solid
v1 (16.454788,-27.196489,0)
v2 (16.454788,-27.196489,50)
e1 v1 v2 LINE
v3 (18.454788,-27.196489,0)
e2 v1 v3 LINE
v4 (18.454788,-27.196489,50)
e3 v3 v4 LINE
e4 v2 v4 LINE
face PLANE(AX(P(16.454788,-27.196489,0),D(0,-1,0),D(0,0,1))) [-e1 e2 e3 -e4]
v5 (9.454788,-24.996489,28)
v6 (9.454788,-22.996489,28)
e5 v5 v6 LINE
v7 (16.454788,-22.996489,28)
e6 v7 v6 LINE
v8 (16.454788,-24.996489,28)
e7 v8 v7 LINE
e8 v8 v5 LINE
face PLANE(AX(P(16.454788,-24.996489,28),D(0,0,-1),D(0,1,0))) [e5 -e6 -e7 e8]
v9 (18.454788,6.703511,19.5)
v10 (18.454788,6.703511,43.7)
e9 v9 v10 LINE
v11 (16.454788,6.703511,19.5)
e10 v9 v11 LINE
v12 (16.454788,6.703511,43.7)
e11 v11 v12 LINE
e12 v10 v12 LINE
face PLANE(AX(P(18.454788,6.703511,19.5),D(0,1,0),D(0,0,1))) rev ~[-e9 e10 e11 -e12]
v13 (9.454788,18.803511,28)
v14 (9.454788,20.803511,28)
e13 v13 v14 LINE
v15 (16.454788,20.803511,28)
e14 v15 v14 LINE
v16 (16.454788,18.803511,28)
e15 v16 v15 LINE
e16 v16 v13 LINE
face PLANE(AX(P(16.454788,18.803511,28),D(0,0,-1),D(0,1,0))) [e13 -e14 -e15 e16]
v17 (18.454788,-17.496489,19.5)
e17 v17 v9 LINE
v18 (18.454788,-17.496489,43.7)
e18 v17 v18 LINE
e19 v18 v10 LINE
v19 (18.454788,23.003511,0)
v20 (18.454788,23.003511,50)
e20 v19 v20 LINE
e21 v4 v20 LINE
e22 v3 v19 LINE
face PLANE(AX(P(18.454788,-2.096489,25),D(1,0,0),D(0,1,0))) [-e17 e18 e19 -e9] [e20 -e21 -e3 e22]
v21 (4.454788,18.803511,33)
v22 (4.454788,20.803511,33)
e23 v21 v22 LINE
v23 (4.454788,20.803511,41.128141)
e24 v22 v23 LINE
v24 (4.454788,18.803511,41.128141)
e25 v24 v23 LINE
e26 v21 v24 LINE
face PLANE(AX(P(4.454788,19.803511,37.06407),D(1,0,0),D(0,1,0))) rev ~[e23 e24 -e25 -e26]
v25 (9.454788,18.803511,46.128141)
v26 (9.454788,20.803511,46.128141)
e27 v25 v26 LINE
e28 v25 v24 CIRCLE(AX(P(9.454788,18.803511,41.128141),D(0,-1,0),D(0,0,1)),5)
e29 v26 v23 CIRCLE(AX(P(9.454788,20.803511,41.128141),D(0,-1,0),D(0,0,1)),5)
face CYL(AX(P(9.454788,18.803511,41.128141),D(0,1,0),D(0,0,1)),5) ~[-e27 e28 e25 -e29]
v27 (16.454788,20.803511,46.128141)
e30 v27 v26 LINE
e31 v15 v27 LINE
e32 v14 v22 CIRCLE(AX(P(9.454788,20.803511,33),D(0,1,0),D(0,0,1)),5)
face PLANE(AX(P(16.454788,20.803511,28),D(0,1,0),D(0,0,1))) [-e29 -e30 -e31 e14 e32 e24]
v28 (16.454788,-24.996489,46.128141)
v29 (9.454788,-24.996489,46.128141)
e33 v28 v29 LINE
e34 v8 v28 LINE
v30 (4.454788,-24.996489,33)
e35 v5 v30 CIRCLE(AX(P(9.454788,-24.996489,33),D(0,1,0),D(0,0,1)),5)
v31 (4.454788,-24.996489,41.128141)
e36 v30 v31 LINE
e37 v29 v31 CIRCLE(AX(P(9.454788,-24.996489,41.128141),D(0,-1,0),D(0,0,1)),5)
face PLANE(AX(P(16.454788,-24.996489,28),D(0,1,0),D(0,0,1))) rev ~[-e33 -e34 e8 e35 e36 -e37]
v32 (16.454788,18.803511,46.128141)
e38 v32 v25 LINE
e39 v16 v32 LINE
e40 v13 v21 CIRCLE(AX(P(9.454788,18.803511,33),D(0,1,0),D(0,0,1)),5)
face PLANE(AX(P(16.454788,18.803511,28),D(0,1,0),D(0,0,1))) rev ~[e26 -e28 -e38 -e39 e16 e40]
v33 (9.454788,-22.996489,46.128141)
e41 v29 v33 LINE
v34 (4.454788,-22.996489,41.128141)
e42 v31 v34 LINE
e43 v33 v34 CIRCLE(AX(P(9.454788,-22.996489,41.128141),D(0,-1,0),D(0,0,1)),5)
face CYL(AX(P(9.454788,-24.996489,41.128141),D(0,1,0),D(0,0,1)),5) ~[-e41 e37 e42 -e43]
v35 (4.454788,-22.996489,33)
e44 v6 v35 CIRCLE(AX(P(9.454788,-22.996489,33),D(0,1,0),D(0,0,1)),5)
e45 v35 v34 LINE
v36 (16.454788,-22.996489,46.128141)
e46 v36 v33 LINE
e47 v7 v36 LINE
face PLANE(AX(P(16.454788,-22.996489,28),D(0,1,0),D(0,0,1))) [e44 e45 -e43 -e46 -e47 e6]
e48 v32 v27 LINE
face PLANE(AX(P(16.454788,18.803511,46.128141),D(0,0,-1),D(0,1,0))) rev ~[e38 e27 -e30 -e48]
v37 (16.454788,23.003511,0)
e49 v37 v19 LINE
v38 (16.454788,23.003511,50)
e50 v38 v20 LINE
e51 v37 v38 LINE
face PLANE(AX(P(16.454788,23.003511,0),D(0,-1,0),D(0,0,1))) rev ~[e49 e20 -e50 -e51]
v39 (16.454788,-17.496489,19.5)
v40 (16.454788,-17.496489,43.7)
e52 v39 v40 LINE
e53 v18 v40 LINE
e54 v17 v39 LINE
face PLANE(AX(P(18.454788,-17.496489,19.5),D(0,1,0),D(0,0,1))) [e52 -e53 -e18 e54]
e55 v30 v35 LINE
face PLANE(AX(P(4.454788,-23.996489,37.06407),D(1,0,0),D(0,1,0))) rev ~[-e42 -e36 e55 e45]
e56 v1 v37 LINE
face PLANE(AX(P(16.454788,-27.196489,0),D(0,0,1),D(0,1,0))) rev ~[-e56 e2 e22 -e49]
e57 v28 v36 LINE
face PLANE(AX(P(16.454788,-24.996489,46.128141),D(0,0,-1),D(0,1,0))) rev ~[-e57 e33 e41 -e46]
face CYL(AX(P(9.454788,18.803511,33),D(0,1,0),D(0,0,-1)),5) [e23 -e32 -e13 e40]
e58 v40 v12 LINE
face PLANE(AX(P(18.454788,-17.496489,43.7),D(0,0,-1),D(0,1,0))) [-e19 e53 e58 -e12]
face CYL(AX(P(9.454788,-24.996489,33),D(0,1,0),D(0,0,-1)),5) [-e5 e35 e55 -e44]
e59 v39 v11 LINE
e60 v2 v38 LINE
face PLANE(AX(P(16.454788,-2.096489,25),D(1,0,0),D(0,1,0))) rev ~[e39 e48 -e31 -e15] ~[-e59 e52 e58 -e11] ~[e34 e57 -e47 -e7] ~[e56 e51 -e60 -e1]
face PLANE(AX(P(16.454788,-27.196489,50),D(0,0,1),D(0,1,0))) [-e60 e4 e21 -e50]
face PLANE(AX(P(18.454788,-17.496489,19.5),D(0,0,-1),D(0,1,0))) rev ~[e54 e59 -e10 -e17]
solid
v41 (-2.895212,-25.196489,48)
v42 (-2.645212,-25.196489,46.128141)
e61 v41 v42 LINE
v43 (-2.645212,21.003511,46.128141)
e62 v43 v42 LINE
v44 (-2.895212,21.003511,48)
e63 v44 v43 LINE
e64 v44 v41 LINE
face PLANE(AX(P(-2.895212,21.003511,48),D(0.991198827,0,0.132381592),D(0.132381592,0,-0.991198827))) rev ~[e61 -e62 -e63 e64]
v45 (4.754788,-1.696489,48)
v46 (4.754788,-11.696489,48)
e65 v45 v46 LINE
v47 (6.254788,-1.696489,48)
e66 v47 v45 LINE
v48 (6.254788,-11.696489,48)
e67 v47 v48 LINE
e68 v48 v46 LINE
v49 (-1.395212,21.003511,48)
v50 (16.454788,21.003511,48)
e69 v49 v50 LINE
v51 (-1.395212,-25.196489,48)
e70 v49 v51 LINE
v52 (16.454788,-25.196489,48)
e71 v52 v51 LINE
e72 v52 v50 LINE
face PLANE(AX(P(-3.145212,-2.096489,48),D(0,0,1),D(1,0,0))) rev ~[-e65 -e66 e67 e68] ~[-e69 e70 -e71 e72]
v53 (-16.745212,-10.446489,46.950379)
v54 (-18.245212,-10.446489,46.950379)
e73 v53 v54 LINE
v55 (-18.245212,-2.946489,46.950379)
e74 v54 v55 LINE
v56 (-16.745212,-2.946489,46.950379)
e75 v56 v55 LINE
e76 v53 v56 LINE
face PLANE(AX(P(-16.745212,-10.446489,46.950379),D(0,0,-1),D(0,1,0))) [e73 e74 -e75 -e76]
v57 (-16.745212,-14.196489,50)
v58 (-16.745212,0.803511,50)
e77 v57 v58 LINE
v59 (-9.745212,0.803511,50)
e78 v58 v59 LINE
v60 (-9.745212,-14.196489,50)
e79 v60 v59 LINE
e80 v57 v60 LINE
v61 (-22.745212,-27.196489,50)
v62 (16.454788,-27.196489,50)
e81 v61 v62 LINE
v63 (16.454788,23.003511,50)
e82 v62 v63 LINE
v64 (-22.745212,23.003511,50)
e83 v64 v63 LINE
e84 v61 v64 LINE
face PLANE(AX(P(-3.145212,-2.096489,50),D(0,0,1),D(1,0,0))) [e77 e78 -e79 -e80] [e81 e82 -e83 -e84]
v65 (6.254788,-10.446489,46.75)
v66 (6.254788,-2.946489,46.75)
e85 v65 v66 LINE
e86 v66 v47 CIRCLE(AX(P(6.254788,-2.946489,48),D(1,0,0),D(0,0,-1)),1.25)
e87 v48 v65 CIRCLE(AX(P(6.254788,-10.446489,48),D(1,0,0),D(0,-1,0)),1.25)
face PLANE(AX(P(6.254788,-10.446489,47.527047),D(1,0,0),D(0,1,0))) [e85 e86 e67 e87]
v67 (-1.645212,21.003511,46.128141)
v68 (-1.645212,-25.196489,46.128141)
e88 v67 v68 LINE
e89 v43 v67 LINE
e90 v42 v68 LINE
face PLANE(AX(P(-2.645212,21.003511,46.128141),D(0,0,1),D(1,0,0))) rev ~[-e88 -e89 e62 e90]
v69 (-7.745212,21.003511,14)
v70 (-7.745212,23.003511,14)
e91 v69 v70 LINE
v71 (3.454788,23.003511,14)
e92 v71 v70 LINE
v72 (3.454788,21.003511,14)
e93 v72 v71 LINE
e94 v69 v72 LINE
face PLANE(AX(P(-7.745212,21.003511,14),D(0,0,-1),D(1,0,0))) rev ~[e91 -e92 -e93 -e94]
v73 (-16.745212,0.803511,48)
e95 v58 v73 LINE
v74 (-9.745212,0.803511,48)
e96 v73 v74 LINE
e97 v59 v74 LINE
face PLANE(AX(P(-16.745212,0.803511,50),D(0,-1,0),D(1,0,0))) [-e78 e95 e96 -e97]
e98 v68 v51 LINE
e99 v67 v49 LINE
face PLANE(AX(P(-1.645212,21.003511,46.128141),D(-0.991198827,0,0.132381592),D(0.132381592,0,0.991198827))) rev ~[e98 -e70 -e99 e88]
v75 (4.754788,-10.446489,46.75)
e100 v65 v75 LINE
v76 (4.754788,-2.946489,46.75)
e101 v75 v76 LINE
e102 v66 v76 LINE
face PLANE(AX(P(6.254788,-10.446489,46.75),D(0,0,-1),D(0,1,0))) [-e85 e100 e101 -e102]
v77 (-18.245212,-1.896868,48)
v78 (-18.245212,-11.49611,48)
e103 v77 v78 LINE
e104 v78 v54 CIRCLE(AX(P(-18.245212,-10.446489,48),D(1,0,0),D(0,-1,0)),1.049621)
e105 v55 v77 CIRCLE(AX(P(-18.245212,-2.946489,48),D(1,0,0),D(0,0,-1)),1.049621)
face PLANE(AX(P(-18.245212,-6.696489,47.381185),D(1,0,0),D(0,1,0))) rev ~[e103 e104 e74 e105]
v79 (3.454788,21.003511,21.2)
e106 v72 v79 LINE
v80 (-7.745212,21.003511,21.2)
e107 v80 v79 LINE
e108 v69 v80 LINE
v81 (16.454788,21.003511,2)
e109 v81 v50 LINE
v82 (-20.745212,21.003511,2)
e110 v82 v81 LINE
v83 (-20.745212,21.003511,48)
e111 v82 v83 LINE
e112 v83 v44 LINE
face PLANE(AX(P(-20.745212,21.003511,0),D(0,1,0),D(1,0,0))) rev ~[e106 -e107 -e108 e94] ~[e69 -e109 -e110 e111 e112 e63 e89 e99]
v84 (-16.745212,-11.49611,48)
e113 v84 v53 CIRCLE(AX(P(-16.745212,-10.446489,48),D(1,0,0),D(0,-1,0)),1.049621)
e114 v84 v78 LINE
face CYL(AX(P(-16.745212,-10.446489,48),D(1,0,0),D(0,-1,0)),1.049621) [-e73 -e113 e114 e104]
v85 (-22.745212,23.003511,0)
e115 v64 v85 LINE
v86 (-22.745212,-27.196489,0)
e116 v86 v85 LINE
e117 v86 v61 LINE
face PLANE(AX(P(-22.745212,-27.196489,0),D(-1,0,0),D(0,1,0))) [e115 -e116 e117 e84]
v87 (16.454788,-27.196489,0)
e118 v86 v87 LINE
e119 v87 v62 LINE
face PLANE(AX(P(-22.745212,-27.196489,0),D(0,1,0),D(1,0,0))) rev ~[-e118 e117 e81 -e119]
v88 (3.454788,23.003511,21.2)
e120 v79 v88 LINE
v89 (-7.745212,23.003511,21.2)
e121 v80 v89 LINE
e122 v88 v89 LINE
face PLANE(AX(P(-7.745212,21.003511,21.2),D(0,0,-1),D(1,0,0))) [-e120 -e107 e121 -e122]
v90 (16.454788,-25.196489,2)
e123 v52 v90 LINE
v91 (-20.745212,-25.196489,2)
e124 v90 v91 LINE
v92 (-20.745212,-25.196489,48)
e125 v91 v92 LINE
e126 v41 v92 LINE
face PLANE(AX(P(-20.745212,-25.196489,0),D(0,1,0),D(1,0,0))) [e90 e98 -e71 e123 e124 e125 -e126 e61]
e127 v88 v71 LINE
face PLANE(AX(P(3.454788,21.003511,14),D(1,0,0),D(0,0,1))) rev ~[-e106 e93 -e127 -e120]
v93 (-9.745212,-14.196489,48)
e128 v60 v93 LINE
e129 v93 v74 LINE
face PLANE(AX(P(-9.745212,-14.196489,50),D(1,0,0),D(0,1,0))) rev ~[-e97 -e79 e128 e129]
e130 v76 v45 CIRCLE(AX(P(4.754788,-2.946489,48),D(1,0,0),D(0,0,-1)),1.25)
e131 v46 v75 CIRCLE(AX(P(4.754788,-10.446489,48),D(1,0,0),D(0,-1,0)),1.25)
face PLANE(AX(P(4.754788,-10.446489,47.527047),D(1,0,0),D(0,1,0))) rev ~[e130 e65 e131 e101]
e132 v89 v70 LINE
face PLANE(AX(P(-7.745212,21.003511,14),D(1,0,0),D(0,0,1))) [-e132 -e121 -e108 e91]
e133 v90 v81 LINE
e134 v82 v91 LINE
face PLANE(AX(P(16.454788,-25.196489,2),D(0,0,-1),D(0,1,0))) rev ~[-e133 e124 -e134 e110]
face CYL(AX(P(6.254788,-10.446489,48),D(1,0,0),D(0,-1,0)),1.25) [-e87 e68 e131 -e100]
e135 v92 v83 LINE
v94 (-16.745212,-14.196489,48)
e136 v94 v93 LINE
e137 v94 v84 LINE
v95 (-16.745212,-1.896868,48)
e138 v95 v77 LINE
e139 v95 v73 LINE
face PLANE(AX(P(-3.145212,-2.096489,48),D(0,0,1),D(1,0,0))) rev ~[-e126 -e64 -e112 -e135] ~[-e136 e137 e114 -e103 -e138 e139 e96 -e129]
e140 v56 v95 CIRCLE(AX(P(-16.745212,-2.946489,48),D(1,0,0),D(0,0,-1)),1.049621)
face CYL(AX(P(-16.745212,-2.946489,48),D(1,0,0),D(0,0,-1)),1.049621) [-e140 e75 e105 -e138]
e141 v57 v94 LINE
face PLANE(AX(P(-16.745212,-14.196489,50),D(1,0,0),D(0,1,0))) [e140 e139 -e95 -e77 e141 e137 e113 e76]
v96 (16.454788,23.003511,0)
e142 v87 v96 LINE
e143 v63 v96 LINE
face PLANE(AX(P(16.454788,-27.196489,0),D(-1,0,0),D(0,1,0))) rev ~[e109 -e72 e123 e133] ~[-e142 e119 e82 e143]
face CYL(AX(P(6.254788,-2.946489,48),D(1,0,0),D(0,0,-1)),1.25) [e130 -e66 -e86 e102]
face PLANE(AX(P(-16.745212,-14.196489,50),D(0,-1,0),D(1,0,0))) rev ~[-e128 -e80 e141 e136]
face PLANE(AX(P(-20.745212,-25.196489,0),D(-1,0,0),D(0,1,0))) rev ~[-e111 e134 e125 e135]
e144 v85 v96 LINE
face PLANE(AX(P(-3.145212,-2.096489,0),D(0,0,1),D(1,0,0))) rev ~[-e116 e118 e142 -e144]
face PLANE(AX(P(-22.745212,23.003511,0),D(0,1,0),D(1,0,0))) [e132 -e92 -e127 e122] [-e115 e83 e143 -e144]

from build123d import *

# Parameters (mm, degrees)
F0_W      = 39.2
F0_H      = 50.2
F0_W_2    = 35.2
F0_H_2    = 46.2
F1_DEPTH  = 2
F2_DEPTH  = 50
F3_W      = 46.2
F3_H      = 4
F3_H_2    = 42
F4_DEPTH  = 25
F5_W      = 35.2
F5_H      = 46.2
F5_W_2    = 7
F5_H_2    = 15
F6_DEPTH  = 2
F8_DEPTH  = 1.5
F10_DEPTH = 46.2
F11_W     = 50.2
F11_H     = 50
F11_W_2   = 0.2
F11_H_2   = 1.8718592376
F11_H_3   = 18.1281407624
F11_W_3   = 2
F11_W_4   = 41.8
F12_DEPTH = 2
F13_DEPTH = 12
F14_R     = 5
F15_W     = 24.2
F15_H     = 24.2
F16_DEPTH = 5
F17_W     = 11.2
F17_H     = 7.2
F18_DEPTH = 4.5
F20_START = -10.2
F20_DEPTH = 1.5


# Not quite as in the source:
# - a feature names something its author has since deleted; it is built from what else it names


with BuildPart() as f1:
    # F0 (on Top) → F1 (new body)
    with BuildSketch(Plane.XY):
        with Locations((-3.1452118158, -2.0964890861)):
            Rectangle(F0_W, F0_H)
        with Locations((-3.1452118158, -2.0964890861)):
            Rectangle(F0_W_2, F0_H_2, mode=Mode.SUBTRACT)
        with Locations((-3.1452118158, -2.0964890861)):
            Rectangle(F0_W_2, F0_H_2)
    extrude(amount=F1_DEPTH)

    # F0 (on Top) → F2 (join)
    with BuildSketch(Plane.XY):
        with Locations((-3.1452118158, -2.0964890861)):
            Rectangle(F0_W, F0_H)
        with Locations((-3.1452118158, -2.0964890861)):
            Rectangle(F0_W_2, F0_H_2, mode=Mode.SUBTRACT)
    extrude(amount=F2_DEPTH)

    # F3 (on face) → F4 (cut)
    with BuildSketch(Plane.YZ.offset(16.4547881842)):
        with Locations((-2.0964890861, 46)):
            Rectangle(F3_W, F3_H)
        with Locations((-2.0964890861, 23)):
            Rectangle(F3_W, F3_H_2)
    extrude(amount=-F4_DEPTH, mode=Mode.SUBTRACT)

    # F5 (on face) → F6 (join)
    with BuildSketch(Plane.XY.offset(50)):
        with Locations((-3.1452118158, -2.0964890861)):
            Rectangle(F5_W, F5_H)
        with Locations((-13.2452118158, -6.6964890861)):
            Rectangle(F5_W_2, F5_H_2, mode=Mode.SUBTRACT)
    extrude(amount=-F6_DEPTH)

    # F7 (on face) → F8 (join)
    with BuildSketch(Plane.YZ.offset(-16.7452118158)):
        with BuildLine():
            ThreePointArc((-2.9464890861, 46.9503788089), (-3.688683348, 47.2578057381), (-3.9961102772, 48))
            Line((-3.9961102772, 48), (-6.6964890861, 48))
            Line((-6.6964890861, 48), (-9.396867895, 48))
            ThreePointArc((-9.396867895, 48), (-9.7042948242, 47.2578057381), (-10.4464890861, 46.9503788089))
            Line((-10.4464890861, 46.9503788089), (-2.9464890861, 46.9503788089))
        make_face()
        with BuildLine():
            ThreePointArc((-2.9464890861, 46.9503788089), (-2.2042948242, 47.2578057381), (-1.896867895, 48))
            Line((-1.896867895, 48), (-3.9961102772, 48))
            ThreePointArc((-3.9961102772, 48), (-3.688683348, 47.2578057381), (-2.9464890861, 46.9503788089))
        make_face()
        with BuildLine():
            ThreePointArc((-11.4961102772, 48), (-11.188683348, 47.2578057381), (-10.4464890861, 46.9503788089))
            ThreePointArc((-10.4464890861, 46.9503788089), (-9.7042948242, 47.2578057381), (-9.396867895, 48))
            Line((-9.396867895, 48), (-11.4961102772, 48))
        make_face()
    extrude(amount=-F8_DEPTH)

    # F9 (on face) → F10 (join, through all)
    with BuildSketch(Plane.XZ.offset(-21.0035109139)):
        Polygon((-2.6452118158, 46.1281407624), (-2.1452118158, 46.1281407624), (-1.6452118158, 46.1281407624), (-1.3952118158, 48), (-2.1452118158, 48), (-2.8952118158, 48), align=None)
    extrude(amount=F10_DEPTH)

    # F17 (on face) → F18 (cut)
    with BuildSketch(Plane.XZ.offset(-21.0035109139)):
        with Locations((-2.1452118158, 17.6)):
            Rectangle(F17_W, F17_H)
    extrude(amount=-F18_DEPTH, mode=Mode.SUBTRACT)

    # F19 (on face) → F20 (join)
    with BuildSketch(Plane.YZ.offset(16.4547881842).offset(F20_START)):
        with BuildLine():
            ThreePointArc((-11.6964890861, 48), (-11.3303725626, 47.1161165235), (-10.4464890861, 46.75))
            ThreePointArc((-10.4464890861, 46.75), (-9.5626056096, 47.1161165235), (-9.1964890861, 48))
            Line((-9.1964890861, 48), (-11.6964890861, 48))
        make_face()
        with BuildLine():
            Line((-10.4464890861, 46.75), (-2.9464890861, 46.75))
            ThreePointArc((-2.9464890861, 46.75), (-3.8303725626, 47.1161165235), (-4.1964890861, 48))
            Line((-4.1964890861, 48), (-6.6964890861, 48))
            Line((-6.6964890861, 48), (-9.1964890861, 48))
            ThreePointArc((-9.1964890861, 48), (-9.5626056096, 47.1161165235), (-10.4464890861, 46.75))
        make_face()
        with BuildLine():
            ThreePointArc((-4.1964890861, 48), (-3.8303725626, 47.1161165235), (-2.9464890861, 46.75))
            ThreePointArc((-2.9464890861, 46.75), (-2.0626056096, 47.1161165235), (-1.6964890861, 48))
            Line((-1.6964890861, 48), (-4.1964890861, 48))
        make_face()
    extrude(amount=-F20_DEPTH)


with BuildPart() as f12:
    # F11 (on face) → F12 (new body)
    with BuildSketch(Plane.YZ.offset(16.4547881842)):
        with Locations((-2.0964890861, 25)):
            Rectangle(F11_W, F11_H)
        Polygon((20.8035109139, 48), (21.0035109139, 48), (21.0035109139, 46.1281407624), (21.0035109139, 28), (21.0035109139, 2), (-25.1964890861, 2), (-25.1964890861, 28), (-25.1964890861, 46.1281407624), (-25.1964890861, 48), (-24.9964890861, 48), (-22.9964890861, 48), (18.8035109139, 48), align=None, mode=Mode.SUBTRACT)
        with Locations((20.9035109139, 47.0640703812)):
            Rectangle(F11_W_2, F11_H_2)
        with Locations((20.9035109139, 37.0640703812)):
            Rectangle(F11_W_2, F11_H_3)
        with Locations((19.8035109139, 47.0640703812)):
            Rectangle(F11_W_3, F11_H_2)
        Polygon((21.0035109139, 2), (21.0035109139, 28), (20.8035109139, 28), (18.8035109139, 28), (-22.9964890861, 28), (-24.9964890861, 28), (-25.1964890861, 28), (-25.1964890861, 2), align=None)
        with Locations((19.8035109139, 37.0640703812)):
            Rectangle(F11_W_3, F11_H_3)
        with Locations((-2.0964890861, 47.0640703812)):
            Rectangle(F11_W_4, F11_H_2)
        with Locations((-2.0964890861, 37.0640703812)):
            Rectangle(F11_W_4, F11_H_3)
        with Locations((-23.9964890861, 47.0640703812)):
            Rectangle(F11_W_3, F11_H_2)
        with Locations((-23.9964890861, 37.0640703812)):
            Rectangle(F11_W_3, F11_H_3)
        with Locations((-25.0964890861, 47.0640703812)):
            Rectangle(F11_W_2, F11_H_2)
        with Locations((-25.0964890861, 37.0640703812)):
            Rectangle(F11_W_2, F11_H_3)
    extrude(amount=F12_DEPTH)

    # F11 (on face) → F13 (join)
    with BuildSketch(Plane.YZ.offset(16.4547881842)):
        with Locations((19.8035109139, 37.0640703812)):
            Rectangle(F11_W_3, F11_H_3)
        with Locations((-23.9964890861, 37.0640703812)):
            Rectangle(F11_W_3, F11_H_3)
    extrude(amount=-F13_DEPTH)

    # F14
    f14_edges = [f12.edges().sort_by_distance(p)[0] for p in [
        (4.454788, 19.803511, 46.128141),
        (4.454788, -23.996489, 46.128141),
        (4.454788, -23.996489, 28),
        (4.454788, 19.803511, 28),
    ]]
    fillet(f14_edges, radius=F14_R)

    # F15 (on face) → F16 (cut)
    with BuildSketch(Plane.YZ.offset(18.4547881842)):
        with Locations((-5.3964890861, 31.6)):
            Rectangle(F15_W, F15_H)
    extrude(amount=-F16_DEPTH, mode=Mode.SUBTRACT)


solid = Compound([f1.part, f12.part])
